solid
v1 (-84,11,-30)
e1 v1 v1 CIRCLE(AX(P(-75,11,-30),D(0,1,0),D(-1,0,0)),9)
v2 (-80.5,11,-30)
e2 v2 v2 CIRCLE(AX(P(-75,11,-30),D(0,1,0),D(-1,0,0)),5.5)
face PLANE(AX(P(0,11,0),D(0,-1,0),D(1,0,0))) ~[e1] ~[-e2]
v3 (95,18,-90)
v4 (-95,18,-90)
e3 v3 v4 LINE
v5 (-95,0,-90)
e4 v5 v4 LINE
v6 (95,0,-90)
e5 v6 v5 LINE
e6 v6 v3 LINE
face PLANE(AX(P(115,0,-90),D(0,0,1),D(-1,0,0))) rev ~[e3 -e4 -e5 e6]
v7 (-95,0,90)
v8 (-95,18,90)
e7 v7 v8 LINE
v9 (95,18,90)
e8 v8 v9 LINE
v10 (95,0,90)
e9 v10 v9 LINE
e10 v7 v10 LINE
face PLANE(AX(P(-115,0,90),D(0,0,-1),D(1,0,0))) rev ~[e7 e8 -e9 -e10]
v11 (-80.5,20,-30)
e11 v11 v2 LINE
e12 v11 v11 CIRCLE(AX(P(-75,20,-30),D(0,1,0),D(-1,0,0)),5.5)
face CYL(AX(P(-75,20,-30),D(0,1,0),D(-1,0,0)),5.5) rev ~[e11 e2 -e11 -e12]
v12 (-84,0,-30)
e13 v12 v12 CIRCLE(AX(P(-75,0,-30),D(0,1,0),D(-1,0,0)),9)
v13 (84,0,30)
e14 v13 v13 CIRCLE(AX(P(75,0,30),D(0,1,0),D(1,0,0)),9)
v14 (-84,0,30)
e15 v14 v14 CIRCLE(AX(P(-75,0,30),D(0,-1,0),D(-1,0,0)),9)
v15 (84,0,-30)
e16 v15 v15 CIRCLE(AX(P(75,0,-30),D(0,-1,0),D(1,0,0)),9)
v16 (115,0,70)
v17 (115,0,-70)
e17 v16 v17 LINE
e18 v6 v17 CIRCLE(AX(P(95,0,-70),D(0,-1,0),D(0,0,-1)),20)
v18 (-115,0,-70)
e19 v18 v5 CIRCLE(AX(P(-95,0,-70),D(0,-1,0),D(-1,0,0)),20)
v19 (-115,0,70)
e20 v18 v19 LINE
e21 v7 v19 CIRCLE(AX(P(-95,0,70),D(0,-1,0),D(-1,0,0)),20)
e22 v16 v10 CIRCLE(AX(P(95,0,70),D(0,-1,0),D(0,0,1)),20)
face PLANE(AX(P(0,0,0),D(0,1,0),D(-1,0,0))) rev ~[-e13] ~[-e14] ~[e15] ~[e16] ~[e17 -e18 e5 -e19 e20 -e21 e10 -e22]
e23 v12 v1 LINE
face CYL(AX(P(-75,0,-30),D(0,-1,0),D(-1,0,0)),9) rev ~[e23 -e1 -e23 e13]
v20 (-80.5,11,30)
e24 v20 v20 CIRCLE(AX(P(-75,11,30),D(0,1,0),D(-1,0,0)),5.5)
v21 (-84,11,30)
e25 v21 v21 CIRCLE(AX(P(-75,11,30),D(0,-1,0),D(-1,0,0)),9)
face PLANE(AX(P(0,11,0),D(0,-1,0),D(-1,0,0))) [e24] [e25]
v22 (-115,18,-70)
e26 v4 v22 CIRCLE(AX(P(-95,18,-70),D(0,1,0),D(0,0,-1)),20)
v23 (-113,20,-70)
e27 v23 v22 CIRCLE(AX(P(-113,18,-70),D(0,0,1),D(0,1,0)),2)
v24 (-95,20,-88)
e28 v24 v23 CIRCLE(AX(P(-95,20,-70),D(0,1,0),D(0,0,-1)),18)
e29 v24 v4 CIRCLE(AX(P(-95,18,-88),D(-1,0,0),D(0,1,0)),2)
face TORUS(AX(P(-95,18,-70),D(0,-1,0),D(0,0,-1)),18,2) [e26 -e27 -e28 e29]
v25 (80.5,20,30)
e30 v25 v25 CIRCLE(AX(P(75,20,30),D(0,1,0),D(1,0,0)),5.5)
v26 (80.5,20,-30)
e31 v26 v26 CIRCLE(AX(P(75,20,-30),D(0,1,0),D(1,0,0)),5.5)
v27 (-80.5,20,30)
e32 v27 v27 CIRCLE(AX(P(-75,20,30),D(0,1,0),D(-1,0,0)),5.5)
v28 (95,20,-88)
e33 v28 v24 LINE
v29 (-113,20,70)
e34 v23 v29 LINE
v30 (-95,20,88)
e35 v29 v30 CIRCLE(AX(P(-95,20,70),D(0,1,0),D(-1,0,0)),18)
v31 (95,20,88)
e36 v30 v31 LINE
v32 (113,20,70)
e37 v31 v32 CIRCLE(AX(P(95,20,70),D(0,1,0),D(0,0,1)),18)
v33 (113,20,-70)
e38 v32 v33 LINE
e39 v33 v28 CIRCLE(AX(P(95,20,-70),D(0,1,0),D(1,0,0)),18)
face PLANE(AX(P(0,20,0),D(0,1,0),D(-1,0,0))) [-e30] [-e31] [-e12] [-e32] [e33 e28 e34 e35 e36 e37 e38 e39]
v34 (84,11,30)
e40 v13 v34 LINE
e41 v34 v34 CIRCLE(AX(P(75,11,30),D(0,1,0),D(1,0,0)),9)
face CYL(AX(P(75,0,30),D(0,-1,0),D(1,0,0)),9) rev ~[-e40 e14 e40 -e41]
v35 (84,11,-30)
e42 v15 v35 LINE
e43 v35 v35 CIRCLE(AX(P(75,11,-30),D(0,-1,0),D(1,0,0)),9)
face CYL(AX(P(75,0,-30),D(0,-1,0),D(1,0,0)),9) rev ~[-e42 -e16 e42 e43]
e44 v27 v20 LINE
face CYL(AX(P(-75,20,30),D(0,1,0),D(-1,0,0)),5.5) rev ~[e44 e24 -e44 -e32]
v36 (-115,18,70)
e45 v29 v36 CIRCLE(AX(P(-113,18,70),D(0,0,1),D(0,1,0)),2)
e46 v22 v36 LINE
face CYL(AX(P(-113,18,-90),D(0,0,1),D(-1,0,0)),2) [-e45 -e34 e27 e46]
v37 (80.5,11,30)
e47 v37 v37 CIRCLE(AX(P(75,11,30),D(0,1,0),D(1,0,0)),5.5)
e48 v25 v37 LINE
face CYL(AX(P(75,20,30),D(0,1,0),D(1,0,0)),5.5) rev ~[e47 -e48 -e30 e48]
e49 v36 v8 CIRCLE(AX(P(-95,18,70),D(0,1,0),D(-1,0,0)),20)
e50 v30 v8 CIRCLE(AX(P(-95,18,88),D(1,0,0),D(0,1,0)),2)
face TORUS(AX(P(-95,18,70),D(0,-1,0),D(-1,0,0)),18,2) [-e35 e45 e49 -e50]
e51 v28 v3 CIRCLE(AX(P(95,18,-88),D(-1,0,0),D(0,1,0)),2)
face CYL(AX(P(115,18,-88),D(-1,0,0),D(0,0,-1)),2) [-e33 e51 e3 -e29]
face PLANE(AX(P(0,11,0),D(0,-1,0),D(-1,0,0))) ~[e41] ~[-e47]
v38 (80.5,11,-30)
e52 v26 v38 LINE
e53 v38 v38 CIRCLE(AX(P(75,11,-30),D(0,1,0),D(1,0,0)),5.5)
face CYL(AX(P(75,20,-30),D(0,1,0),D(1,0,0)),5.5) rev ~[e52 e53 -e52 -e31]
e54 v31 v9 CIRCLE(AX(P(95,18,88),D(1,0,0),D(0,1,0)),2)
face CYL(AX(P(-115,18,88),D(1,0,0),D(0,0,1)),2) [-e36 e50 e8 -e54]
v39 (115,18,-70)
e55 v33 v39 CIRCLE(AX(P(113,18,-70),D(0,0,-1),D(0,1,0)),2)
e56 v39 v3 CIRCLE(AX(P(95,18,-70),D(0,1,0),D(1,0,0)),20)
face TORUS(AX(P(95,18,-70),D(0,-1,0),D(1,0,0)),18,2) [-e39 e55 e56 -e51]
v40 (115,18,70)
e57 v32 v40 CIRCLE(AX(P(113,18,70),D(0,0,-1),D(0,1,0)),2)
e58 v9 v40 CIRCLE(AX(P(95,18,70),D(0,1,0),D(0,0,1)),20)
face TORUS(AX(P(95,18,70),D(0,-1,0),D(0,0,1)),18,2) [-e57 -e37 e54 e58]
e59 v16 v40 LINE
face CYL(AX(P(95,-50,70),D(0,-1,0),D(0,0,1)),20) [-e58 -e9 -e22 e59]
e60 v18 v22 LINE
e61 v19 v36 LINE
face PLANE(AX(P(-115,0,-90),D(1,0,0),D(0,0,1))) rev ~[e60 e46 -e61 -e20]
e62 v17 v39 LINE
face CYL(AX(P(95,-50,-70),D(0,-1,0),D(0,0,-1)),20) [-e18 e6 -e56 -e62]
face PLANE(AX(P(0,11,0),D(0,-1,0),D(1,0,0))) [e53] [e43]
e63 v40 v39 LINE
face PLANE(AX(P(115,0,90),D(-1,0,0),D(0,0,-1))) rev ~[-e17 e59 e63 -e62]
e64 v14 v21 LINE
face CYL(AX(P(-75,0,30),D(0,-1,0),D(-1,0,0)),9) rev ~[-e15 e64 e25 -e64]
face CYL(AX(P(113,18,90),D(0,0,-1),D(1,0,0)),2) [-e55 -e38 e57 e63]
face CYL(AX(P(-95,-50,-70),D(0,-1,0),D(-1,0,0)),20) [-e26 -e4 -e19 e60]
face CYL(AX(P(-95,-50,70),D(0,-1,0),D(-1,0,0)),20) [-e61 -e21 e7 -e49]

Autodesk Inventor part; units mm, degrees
ref_plane "YZ Plane" through (0, 0, 0) normal (1, 0, 0) x (0, 1, 0)
ref_plane "XZ Plane" through (0, 0, 0) normal (0, 1, 0) x (-1, 0, 0)
ref_plane "XY Plane" through (0, 0, 0) normal (0, 0, 1) x (1, 0, 0)
sketch "Sketch1" plane through (0, 0, 0) normal (0, 1, 0) x (-1, 0, 0)
  line L0 (115, 90) -> (-115, 90)
  line L1 (-115, 90) -> (-115, -90)
  line L2 (-115, -90) -> (115, -90)
  line L3 (115, -90) -> (115, 90)
  line L4 (115, 90) -> (-115, -90) construction
  line L5 (-115, 90) -> (115, -90) construction
  point P0 (0, 0)
  dimension "d0" = 230
  dimension "d1" = 180
extrude "Extrusion1" add sketch "Sketch1" along normal blind 20
fillet "Fillet1" radius 2 4 edges at (0, 20, 90) (115, 20, 0) (0, 20, -90) (-115, 20, 0)
fillet "Fillet2" radius 20 8 edges at (-114.4142, 19.4142, 89.4142) (-115, 9, 90) (114.4142, 19.4142, 89.4142) (115, 9, 90) (-115, 9, -90) (-114.4142, 19.4142, -89.4142) (114.4142, 19.4142, -89.4142) (115, 9, -90)
sketch "Sketch2" plane through (0, 20, 0) normal (0, 1, 0) x (1, 0, 0)
  line L0 (75, 30) -> (0, 0)
  circle A0 centre (75, 30) radius 5.5
  dimension "d6" = 11
extrude "Extrusion2" cut sketch "Sketch2" against normal blind 20
sketch "Sketch3" plane through (0, 0, 0) normal (0, -1, 0) x (1, 0, 0)
  circle A0 centre (75, -30) radius 5.5 projected
  circle A1 centre (75, -30) radius 9
  point P0 (0, 0)
  dimension "d9" = 18
extrude "Extrusion3" cut sketch "Sketch3" against normal blind 11 contours A0 | A1
mirror "Mirror1" about plane through (0, 0, 0) normal (0, 0, 1) of "Extrusion2", "Extrusion3"
mirror "Mirror2" about plane through (0, 0, 0) normal (1, 0, 0) of "Extrusion2", "Extrusion3", "Mirror1"
properties part number "stand" material "Wood (Birch)"
